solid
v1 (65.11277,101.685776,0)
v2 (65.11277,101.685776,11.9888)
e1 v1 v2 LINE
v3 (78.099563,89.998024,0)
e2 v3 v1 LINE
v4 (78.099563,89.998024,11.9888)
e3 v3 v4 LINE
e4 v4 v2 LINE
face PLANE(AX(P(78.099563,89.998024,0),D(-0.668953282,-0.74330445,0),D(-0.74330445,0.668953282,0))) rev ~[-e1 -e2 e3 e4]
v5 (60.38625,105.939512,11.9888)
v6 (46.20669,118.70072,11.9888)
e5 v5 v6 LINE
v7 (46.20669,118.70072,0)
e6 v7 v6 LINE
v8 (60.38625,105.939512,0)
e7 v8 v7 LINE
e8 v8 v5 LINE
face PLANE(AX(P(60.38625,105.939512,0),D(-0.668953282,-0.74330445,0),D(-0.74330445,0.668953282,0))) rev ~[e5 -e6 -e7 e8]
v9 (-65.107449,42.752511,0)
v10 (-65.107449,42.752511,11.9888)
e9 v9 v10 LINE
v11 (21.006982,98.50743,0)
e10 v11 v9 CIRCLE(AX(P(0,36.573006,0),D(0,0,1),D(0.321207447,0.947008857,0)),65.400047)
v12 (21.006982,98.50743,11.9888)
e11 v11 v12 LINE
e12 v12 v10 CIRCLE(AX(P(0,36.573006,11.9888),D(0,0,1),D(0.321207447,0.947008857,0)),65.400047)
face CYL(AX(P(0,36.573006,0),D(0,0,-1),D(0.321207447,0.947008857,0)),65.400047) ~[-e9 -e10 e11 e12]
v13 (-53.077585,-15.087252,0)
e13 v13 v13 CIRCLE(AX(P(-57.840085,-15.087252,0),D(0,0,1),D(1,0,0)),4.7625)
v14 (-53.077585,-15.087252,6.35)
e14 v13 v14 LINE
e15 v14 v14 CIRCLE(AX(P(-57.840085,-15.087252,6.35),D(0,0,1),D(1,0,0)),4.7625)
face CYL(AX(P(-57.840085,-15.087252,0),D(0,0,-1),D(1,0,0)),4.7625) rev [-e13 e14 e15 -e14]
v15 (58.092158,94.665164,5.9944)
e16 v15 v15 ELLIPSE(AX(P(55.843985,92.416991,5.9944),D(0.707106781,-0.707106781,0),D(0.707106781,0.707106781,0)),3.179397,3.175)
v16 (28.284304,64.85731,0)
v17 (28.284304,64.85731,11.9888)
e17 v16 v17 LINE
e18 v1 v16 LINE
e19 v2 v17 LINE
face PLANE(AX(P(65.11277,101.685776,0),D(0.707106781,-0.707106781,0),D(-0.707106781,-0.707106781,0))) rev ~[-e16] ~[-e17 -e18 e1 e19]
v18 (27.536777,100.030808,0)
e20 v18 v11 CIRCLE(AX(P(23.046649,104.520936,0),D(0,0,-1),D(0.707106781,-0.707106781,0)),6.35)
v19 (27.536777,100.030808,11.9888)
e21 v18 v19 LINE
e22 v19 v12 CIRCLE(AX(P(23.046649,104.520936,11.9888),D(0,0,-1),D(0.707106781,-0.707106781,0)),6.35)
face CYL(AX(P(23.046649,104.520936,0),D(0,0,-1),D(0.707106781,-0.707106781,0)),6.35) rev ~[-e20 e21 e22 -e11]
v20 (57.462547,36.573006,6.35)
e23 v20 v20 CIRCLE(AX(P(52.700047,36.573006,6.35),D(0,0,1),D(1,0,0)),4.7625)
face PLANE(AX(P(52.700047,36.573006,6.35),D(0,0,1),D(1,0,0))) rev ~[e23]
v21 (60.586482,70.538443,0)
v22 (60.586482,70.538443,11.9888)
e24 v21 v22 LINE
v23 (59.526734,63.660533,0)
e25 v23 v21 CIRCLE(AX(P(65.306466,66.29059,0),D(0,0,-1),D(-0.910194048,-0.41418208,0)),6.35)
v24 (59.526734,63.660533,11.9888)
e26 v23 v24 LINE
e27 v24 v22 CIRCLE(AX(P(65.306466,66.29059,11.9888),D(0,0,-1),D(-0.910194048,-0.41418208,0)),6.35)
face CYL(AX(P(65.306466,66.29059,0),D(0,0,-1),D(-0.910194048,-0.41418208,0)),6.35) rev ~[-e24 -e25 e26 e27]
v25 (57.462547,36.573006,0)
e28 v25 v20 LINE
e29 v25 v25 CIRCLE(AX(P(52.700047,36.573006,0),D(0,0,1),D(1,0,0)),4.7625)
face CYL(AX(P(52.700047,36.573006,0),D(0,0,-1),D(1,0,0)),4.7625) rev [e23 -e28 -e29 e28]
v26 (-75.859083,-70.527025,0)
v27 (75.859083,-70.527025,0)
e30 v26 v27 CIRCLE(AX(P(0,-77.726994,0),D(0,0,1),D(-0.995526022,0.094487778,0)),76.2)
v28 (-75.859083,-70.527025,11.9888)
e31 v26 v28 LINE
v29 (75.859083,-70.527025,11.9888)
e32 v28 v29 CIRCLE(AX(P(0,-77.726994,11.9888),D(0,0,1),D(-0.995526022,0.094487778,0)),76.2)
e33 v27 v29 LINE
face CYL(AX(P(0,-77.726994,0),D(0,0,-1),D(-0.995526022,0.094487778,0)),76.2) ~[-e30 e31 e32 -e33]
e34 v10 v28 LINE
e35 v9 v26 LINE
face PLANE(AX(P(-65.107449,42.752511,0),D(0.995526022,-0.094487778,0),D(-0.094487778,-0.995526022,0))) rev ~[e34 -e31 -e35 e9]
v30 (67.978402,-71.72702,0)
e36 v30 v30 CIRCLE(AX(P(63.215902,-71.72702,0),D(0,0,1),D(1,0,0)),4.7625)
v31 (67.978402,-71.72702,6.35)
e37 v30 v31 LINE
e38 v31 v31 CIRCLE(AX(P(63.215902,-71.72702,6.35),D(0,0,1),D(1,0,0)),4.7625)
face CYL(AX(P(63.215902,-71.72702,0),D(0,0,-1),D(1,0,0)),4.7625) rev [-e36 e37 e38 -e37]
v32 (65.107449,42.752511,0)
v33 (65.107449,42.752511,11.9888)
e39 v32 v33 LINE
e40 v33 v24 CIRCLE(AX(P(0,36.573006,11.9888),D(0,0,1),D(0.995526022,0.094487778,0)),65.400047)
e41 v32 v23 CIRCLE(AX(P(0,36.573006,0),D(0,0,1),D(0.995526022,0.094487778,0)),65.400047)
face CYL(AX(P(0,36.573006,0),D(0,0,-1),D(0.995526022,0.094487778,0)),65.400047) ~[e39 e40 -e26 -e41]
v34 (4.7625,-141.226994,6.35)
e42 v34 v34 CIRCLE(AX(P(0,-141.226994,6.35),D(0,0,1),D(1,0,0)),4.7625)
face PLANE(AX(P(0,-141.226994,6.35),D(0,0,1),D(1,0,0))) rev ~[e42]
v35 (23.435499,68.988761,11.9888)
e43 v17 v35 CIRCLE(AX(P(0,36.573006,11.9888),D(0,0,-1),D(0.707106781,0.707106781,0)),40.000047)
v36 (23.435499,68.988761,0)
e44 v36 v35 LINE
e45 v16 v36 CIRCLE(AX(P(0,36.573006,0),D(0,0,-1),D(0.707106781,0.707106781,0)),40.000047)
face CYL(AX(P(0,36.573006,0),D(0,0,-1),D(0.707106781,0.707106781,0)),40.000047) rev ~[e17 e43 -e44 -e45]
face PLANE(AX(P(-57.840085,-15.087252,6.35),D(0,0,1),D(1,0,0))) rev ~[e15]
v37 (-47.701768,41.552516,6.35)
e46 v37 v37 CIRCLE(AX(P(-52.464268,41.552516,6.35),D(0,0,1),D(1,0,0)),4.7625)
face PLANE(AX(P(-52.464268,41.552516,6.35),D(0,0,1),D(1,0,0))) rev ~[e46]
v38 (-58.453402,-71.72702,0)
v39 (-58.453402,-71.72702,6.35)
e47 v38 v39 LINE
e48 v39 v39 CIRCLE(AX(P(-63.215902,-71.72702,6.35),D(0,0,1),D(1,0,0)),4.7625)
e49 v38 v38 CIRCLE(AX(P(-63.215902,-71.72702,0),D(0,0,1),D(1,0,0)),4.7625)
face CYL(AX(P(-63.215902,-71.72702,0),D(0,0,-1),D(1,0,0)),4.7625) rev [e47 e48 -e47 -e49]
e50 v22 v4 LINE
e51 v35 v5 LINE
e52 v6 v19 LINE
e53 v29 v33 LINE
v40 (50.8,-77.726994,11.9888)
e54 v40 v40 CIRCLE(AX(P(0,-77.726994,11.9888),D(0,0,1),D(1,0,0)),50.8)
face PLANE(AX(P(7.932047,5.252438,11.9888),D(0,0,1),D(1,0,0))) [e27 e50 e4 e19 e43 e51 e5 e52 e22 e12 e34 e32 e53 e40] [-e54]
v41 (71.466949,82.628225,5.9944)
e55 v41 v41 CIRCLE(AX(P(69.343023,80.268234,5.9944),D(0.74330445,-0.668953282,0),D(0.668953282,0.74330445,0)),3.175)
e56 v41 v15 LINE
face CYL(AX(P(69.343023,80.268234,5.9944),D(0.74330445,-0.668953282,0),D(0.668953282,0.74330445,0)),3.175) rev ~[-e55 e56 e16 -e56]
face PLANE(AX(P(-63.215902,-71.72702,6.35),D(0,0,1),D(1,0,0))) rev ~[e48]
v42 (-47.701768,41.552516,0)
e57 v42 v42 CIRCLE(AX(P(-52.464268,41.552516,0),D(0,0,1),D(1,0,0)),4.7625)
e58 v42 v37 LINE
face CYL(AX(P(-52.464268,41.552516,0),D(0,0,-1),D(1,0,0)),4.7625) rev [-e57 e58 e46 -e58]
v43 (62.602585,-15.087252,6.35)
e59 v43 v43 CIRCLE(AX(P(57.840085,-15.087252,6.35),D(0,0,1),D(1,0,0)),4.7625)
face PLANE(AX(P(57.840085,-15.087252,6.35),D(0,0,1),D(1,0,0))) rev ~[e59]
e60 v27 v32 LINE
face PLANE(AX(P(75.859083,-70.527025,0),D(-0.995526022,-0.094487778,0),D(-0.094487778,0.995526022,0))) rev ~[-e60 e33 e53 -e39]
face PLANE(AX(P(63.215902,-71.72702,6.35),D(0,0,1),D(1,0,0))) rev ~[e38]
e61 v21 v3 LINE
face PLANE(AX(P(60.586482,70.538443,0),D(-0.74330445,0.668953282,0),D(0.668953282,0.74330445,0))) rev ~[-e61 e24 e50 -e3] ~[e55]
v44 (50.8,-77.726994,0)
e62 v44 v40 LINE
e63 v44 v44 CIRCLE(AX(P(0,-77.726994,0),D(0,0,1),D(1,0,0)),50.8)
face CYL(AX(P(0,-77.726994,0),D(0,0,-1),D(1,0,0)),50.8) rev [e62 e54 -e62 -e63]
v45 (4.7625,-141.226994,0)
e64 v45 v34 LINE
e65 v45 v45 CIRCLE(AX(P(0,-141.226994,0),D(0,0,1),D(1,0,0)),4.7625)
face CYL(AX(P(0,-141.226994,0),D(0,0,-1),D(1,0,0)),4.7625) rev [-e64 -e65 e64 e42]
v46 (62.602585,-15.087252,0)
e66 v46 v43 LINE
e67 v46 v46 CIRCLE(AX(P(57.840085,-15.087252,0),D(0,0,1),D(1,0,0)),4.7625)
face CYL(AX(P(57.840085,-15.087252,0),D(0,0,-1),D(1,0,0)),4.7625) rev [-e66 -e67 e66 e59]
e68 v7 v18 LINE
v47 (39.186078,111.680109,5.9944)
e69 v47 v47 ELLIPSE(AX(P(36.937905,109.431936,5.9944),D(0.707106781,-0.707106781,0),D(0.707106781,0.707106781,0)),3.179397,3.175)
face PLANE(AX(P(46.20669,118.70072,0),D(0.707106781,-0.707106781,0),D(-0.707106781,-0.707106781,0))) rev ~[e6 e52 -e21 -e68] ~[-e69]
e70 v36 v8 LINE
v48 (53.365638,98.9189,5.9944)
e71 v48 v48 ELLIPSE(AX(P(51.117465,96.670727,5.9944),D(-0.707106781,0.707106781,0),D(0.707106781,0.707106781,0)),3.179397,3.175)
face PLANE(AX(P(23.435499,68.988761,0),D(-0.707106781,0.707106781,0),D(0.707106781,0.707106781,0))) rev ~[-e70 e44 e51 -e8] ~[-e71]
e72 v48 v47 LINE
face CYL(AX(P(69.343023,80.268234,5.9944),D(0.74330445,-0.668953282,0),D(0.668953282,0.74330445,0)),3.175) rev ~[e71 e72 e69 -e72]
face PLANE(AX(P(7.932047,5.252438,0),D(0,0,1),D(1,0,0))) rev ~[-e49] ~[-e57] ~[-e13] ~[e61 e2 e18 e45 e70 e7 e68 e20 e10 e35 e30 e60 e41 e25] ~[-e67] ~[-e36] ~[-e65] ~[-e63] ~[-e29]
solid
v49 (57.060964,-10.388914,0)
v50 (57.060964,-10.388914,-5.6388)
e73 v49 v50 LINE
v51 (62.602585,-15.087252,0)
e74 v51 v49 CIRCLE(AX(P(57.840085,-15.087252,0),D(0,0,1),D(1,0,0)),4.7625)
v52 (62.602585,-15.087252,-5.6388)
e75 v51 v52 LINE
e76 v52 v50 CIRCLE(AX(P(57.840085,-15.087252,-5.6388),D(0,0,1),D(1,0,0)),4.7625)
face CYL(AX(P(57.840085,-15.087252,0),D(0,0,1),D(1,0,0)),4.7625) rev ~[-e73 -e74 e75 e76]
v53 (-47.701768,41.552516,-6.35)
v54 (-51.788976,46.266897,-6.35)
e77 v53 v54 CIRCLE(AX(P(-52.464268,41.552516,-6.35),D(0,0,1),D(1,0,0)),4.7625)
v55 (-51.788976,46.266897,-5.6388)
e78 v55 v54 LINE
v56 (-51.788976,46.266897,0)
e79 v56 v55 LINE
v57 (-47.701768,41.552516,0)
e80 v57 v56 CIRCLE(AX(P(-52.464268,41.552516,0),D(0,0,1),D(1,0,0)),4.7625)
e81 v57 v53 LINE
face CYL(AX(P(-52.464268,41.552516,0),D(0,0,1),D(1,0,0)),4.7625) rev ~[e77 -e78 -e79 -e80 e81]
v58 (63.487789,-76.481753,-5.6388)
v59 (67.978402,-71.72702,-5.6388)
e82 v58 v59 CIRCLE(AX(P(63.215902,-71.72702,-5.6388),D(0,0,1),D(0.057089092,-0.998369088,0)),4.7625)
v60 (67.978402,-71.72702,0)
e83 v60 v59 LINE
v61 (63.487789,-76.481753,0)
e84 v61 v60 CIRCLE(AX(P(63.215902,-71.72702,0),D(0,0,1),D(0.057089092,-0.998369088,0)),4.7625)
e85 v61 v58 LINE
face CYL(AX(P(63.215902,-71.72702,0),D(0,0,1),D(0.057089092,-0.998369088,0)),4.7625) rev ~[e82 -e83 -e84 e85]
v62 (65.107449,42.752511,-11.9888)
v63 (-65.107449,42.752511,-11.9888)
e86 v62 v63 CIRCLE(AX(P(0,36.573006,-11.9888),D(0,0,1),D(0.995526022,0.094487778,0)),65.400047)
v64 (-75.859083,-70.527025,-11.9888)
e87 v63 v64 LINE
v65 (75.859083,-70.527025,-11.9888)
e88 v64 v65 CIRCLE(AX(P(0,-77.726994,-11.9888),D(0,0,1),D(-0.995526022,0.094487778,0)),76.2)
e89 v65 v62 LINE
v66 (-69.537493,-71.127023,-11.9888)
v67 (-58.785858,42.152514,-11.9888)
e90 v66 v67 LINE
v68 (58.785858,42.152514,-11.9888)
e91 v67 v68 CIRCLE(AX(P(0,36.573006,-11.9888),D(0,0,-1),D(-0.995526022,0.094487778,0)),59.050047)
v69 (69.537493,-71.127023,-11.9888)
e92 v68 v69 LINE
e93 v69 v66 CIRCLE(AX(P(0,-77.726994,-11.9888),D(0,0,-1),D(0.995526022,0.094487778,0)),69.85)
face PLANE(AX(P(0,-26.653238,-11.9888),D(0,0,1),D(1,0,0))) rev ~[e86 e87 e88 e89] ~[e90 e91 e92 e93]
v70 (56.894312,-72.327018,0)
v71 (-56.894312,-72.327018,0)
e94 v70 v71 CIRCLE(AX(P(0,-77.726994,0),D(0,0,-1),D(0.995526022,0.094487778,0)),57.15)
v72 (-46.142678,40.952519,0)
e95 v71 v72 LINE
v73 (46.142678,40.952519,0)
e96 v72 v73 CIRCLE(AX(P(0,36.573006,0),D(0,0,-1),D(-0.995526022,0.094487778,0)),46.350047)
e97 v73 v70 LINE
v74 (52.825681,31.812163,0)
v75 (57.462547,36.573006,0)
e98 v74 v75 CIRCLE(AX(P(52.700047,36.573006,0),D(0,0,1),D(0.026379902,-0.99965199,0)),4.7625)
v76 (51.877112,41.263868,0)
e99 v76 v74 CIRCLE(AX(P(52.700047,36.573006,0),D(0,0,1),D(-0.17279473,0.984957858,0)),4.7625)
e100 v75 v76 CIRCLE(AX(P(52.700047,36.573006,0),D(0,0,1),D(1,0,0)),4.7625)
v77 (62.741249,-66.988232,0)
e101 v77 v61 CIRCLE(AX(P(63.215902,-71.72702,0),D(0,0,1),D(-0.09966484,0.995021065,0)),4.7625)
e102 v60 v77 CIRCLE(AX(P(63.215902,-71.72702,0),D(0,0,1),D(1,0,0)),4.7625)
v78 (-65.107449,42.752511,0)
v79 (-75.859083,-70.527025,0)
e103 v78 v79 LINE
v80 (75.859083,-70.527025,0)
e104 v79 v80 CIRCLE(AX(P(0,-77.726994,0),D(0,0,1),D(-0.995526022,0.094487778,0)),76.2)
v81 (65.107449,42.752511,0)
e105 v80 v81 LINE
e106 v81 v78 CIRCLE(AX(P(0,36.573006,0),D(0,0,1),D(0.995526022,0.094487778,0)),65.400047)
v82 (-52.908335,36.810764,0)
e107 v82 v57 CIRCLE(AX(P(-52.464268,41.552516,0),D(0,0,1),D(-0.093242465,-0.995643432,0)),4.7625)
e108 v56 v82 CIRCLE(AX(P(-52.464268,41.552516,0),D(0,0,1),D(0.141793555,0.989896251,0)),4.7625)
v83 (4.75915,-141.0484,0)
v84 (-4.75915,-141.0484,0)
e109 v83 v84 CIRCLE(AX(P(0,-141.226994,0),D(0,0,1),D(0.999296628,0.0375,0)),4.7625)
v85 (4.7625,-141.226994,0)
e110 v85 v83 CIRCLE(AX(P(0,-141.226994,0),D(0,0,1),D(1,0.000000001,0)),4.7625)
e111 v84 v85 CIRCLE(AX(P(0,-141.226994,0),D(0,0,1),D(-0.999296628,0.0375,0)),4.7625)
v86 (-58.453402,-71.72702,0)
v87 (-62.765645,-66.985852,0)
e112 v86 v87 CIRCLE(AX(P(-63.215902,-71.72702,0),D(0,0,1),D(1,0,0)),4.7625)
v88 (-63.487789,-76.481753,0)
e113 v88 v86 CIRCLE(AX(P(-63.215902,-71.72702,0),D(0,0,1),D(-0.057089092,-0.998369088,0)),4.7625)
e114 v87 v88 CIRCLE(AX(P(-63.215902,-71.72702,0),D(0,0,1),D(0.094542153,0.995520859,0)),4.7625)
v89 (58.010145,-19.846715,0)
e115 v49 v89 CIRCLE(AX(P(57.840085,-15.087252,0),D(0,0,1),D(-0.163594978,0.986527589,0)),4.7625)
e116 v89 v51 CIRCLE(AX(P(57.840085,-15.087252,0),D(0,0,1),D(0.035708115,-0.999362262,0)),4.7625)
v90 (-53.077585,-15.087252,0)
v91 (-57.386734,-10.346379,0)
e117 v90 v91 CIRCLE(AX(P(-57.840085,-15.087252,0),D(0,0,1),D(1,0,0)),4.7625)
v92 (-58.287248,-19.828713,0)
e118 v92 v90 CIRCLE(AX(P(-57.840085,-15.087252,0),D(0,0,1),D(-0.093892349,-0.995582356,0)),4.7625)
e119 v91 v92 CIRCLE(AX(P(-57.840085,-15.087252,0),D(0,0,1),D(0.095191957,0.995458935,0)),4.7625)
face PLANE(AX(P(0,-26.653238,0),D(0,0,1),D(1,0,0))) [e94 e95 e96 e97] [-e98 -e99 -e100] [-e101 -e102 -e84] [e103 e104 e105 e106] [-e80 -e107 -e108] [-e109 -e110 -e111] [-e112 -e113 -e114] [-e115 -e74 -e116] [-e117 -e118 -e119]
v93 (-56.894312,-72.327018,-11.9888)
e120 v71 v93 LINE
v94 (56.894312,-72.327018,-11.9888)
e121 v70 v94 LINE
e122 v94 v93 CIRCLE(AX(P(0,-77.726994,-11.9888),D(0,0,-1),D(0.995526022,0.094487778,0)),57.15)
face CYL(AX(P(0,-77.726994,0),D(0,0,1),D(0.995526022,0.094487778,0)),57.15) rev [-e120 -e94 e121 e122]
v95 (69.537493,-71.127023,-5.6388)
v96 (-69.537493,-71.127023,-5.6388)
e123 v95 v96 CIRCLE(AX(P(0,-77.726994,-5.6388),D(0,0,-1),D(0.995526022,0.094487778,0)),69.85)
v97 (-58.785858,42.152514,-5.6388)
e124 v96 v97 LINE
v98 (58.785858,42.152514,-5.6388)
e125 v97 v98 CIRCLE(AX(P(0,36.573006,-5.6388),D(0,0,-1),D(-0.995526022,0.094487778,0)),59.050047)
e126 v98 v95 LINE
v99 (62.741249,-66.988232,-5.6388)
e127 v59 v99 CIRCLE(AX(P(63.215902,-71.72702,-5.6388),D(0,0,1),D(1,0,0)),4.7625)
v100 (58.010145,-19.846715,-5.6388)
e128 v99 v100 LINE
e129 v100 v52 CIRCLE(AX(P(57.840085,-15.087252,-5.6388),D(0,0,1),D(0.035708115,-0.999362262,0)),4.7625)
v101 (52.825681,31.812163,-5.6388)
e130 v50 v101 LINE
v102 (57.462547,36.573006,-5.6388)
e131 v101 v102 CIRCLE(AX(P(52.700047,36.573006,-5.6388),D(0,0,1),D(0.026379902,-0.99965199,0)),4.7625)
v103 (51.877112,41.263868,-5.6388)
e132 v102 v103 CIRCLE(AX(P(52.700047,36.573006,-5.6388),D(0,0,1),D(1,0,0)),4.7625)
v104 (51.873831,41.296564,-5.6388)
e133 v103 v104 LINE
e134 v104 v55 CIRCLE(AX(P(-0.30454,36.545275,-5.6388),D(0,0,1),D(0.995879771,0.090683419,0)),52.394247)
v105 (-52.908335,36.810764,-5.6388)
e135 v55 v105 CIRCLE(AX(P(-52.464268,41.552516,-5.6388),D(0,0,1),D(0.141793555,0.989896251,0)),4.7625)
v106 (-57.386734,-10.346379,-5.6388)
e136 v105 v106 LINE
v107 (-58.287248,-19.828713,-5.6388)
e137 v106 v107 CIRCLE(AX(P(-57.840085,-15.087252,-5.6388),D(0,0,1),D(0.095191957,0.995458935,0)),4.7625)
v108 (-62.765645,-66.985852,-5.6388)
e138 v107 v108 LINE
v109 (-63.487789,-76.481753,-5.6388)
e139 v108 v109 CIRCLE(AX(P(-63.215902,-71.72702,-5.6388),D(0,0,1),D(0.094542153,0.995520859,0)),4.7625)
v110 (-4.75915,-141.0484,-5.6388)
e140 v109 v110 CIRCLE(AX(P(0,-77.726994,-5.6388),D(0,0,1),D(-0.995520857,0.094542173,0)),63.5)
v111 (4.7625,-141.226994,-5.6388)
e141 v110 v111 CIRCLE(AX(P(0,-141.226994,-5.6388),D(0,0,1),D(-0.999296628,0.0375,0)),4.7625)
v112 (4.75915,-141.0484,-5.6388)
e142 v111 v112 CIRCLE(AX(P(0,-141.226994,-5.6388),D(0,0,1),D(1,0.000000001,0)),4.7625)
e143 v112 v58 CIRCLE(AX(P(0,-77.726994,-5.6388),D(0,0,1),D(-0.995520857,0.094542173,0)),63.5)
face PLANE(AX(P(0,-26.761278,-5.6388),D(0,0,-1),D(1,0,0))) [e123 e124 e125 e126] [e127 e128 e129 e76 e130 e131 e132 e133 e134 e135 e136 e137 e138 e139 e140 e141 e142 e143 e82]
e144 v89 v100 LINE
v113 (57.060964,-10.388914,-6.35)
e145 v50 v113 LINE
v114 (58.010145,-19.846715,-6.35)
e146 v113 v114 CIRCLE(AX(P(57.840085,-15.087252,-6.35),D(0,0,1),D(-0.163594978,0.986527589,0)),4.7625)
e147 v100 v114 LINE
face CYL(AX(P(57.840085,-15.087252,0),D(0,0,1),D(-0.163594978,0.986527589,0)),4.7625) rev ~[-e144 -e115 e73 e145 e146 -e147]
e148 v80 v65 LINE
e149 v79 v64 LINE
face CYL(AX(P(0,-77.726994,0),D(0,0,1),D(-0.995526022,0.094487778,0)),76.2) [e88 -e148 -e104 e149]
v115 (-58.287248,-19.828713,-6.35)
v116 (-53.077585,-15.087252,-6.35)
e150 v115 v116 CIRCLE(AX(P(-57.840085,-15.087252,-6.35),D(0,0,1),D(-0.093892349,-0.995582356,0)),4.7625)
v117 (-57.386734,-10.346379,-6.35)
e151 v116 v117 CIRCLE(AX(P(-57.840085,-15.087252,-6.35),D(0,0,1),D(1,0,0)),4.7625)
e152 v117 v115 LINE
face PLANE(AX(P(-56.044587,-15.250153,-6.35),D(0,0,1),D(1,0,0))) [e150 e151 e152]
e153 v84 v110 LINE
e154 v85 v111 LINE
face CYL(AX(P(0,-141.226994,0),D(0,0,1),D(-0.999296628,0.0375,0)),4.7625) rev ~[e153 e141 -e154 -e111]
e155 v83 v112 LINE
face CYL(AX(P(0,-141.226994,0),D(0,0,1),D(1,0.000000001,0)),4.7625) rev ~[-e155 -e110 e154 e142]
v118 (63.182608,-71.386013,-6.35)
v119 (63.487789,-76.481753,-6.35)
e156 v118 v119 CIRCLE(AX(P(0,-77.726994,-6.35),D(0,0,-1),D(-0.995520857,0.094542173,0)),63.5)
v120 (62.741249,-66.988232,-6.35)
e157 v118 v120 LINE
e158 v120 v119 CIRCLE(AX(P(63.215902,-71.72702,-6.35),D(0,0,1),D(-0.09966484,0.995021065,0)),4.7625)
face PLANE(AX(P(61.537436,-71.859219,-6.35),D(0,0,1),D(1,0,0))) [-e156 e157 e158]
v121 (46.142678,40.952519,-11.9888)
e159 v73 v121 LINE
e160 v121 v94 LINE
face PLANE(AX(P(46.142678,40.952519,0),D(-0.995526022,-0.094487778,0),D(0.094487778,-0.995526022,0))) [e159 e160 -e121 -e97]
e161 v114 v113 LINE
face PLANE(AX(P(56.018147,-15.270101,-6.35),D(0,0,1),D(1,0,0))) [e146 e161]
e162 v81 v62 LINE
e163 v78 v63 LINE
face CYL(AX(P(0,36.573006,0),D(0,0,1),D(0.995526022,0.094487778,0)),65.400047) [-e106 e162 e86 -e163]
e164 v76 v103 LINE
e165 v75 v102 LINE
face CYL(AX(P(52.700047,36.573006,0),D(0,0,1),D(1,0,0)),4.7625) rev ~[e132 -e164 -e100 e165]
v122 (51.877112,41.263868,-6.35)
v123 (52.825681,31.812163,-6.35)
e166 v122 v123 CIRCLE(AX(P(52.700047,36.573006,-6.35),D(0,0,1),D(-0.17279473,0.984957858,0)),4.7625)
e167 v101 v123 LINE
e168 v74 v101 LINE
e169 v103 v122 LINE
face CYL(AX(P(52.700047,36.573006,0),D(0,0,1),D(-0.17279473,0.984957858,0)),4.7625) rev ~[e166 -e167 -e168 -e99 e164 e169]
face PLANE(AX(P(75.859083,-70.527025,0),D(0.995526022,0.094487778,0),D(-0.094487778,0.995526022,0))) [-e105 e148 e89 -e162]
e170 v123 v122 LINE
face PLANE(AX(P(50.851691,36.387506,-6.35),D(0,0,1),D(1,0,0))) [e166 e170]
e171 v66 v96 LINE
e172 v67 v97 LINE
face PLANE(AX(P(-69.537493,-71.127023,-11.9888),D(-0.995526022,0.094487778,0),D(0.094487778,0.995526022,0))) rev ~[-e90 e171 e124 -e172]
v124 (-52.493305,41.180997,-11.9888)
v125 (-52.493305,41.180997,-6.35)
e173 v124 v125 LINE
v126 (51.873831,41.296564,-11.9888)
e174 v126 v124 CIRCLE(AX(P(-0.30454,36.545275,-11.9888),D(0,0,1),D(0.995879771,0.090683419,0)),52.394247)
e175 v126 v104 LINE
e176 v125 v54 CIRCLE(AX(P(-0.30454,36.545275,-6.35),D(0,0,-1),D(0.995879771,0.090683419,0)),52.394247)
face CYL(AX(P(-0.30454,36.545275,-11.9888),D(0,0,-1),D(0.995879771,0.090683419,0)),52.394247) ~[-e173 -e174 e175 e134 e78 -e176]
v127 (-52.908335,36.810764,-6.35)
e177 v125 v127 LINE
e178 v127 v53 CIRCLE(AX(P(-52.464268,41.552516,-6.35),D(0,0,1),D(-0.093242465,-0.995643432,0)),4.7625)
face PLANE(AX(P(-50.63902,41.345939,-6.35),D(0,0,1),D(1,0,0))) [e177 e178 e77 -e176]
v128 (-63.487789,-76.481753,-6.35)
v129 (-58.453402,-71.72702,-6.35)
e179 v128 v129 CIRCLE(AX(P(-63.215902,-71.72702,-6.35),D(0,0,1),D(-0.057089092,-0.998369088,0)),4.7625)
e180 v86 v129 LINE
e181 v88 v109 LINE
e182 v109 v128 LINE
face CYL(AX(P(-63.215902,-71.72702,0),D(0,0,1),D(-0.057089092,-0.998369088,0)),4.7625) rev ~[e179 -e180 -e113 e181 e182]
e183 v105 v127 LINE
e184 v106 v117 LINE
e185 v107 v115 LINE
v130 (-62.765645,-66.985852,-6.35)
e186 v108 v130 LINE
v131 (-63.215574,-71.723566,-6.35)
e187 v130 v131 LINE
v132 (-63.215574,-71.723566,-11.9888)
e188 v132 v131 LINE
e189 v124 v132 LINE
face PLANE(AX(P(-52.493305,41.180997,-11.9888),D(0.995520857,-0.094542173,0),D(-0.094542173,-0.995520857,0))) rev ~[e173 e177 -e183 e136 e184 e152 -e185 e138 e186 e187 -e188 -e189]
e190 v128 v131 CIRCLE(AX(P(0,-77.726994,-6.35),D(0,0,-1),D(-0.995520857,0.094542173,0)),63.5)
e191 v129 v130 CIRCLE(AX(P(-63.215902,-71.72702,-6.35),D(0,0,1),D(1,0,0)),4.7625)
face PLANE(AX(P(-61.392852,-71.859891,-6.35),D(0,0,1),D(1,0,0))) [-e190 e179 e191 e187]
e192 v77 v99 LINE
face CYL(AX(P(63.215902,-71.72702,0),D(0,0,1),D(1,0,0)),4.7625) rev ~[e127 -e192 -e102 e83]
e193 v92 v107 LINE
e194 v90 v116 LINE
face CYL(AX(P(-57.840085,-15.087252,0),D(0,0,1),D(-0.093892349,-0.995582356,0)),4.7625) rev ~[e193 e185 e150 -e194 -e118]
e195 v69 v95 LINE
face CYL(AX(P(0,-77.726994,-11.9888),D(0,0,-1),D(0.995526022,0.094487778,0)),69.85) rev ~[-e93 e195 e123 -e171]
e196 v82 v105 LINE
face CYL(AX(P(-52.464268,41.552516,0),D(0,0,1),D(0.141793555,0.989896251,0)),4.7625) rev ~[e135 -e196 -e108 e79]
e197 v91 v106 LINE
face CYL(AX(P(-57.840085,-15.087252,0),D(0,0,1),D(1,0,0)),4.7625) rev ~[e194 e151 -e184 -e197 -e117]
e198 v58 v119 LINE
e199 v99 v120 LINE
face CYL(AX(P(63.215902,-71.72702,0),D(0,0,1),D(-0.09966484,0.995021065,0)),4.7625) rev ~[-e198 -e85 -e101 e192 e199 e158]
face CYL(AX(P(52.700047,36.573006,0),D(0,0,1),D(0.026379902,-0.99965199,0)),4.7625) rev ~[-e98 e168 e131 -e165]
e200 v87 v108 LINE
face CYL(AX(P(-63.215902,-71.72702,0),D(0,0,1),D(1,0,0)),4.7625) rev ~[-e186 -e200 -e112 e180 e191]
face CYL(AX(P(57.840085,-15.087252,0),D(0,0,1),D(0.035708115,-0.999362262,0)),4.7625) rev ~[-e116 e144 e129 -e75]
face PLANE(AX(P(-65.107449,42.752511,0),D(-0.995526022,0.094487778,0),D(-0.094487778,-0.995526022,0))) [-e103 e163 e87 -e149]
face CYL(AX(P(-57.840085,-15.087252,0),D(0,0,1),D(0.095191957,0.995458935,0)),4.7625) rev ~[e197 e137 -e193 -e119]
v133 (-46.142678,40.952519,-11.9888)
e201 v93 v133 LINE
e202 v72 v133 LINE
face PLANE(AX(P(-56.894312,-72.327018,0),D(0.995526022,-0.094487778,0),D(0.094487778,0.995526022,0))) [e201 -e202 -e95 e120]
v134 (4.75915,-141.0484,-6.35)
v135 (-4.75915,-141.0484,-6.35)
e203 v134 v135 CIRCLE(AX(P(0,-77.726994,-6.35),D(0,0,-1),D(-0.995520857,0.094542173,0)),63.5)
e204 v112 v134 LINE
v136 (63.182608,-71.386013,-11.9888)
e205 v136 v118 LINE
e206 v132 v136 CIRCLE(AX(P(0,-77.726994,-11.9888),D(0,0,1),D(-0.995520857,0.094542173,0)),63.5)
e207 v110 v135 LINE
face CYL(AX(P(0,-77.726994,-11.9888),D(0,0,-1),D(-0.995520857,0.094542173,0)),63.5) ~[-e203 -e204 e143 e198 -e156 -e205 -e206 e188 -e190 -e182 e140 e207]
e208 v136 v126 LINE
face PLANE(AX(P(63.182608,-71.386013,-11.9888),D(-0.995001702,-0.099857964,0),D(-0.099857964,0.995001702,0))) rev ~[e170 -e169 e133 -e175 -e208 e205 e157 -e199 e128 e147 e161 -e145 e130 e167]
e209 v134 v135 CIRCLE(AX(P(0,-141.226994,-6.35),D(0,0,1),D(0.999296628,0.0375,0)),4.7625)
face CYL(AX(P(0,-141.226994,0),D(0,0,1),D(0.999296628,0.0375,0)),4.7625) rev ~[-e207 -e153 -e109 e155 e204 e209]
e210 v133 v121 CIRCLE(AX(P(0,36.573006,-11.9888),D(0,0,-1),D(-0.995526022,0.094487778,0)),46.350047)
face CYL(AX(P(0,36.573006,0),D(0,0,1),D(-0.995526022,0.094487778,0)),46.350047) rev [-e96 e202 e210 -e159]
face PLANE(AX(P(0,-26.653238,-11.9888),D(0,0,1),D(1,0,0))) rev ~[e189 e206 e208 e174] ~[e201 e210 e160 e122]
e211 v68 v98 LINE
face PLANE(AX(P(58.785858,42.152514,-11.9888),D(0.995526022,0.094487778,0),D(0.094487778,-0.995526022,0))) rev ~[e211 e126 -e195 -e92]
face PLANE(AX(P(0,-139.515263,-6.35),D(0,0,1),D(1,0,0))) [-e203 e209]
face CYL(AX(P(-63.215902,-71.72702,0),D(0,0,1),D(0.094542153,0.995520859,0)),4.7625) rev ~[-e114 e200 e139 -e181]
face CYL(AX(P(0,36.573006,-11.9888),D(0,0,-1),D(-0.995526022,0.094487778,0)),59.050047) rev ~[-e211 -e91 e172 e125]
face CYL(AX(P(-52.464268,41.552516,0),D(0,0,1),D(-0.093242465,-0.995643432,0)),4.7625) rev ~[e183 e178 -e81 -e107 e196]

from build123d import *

# Parameters (mm, degrees)
F3_R      = 4.7625
F3_R_2    = 50.8
F4_DEPTH  = 11.9888
F5_R      = 3.175
F6_DEPTH  = 133.893314743
F8_DEPTH  = 11.9888
F10_DEPTH = 6.35
F11_DEPTH = 6.35
F12_DEPTH = 6.35


# Not quite as in the source:
# - a variable given as a bare number and used for a length is read in inches; the dataset says mm whatever the document's units were


with BuildPart() as f4:
    # F3 (on Top) → F4 (new body)
    with BuildSketch(Plane.XY):
        with BuildLine():
            ThreePointArc((28.2843044815, 64.8573104526), (-25.9422769004, 6.1262979516), (23.4354987006, 68.9887607928))
            Line((23.4354987006, 68.9887607928), (60.3862498519, 105.9395119442))
            Line((60.3862498519, 105.9395119442), (46.2066900189, 118.7007204743))
            Line((46.2066900189, 118.7007204743), (27.5367774821, 100.0308079375))
            ThreePointArc((27.5367774821, 100.0308079375), (24.4893412706, 98.3369938712), (21.0069821329, 98.5074297537))
            ThreePointArc((21.0069821329, 98.5074297537), (-35.5438535466, 91.4710990406), (-65.1074486079, 42.7525110788))
            Line((-65.1074486079, 42.7525110788), (-75.8590828523, -70.5270253622))
            ThreePointArc((-75.8590828523, -70.5270253622), (0, -153.9269940288), (75.8590828523, -70.5270253622))
            Line((75.8590828523, -70.5270253622), (65.1074486079, 42.7525110788))
            ThreePointArc((65.1074486079, 42.7525110788), (63.1878642435, 53.4389467972), (59.5267335018, 63.6605334739))
            ThreePointArc((59.5267335018, 63.6605334739), (59.0305262413, 67.2575870183), (60.5864824449, 70.5384430254))
            Line((60.5864824449, 70.5384430254), (78.0995628634, 89.9980240728))
            Line((78.0995628634, 89.9980240728), (65.1127697963, 101.6857757674))
            Line((65.1127697963, 101.6857757674), (28.2843044815, 64.8573104526))
        make_face()
        with Locations((0, -141.2269940288)):
            Circle(F3_R, mode=Mode.SUBTRACT)
        with Locations((-63.215902377, -71.72702014)):
            Circle(F3_R, mode=Mode.SUBTRACT)
        with Locations((0, -77.7269940288)):
            Circle(F3_R_2, mode=Mode.SUBTRACT)
        with Locations((63.215902377, -71.72702014)):
            Circle(F3_R, mode=Mode.SUBTRACT)
        with Locations((-57.8400852547, -15.0872519195)):
            Circle(F3_R, mode=Mode.SUBTRACT)
        with Locations((-52.4642681325, 41.552516301)):
            Circle(F3_R, mode=Mode.SUBTRACT)
        with Locations((57.8400852547, -15.0872519195)):
            Circle(F3_R, mode=Mode.SUBTRACT)
        with Locations((52.700047, 36.5730059712)):
            Circle(F3_R, mode=Mode.SUBTRACT)
        with Locations((-52.4642681325, 41.552516301)):
            Circle(F3_R)
        with Locations((52.700047, 36.5730059712)):
            Circle(F3_R)
        with Locations((57.8400852547, -15.0872519195)):
            Circle(F3_R)
        with Locations((63.215902377, -71.72702014)):
            Circle(F3_R)
        with Locations((0, -141.2269940288)):
            Circle(F3_R)
        with Locations((-63.215902377, -71.72702014)):
            Circle(F3_R)
        with Locations((-57.8400852547, -15.0872519195)):
            Circle(F3_R)
    extrude(amount=F4_DEPTH)

    # F5 (on face) → F6 (cut, through all)
    with BuildSketch(Plane(origin=(-1.6001270702, 1.4400697524, 0), x_dir=(0.6689532824, 0.7433044504, 0), z_dir=(0.7433044504, -0.6689532824, 0))):
        with Locations((106.0509778379, 5.9944)):
            Circle(F5_R)
    extrude(amount=-F6_DEPTH, mode=Mode.SUBTRACT)

    # F3 (on Top) → F10 (cut)
    with BuildSketch(Plane.XY):
        with Locations((-63.215902377, -71.72702014)):
            Circle(F3_R)
        with Locations((0, -141.2269940288)):
            Circle(F3_R)
        with Locations((63.215902377, -71.72702014)):
            Circle(F3_R)
        with Locations((57.8400852547, -15.0872519195)):
            Circle(F3_R)
        with Locations((52.700047, 36.5730059712)):
            Circle(F3_R)
        with Locations((-57.8400852547, -15.0872519195)):
            Circle(F3_R)
        with Locations((-52.4642681325, 41.552516301)):
            Circle(F3_R)
    extrude(amount=F10_DEPTH, mode=Mode.SUBTRACT)


with BuildPart() as f8:
    # F7 (on Top) → F8 (new body)
    with BuildSketch(Plane.XY):
        with BuildLine():
            Line((-65.1074486079, 42.7525110788), (-75.8590828523, -70.5270253622))
            ThreePointArc((-75.8590828523, -70.5270253622), (0, -153.9269940288), (75.8590828523, -70.5270253622))
            Line((75.8590828523, -70.5270253622), (65.1074486079, 42.7525110788))
            ThreePointArc((65.1074486079, 42.7525110788), (0, 101.9730529712), (-65.1074486079, 42.7525110788))
        make_face()
        with BuildLine():
            ThreePointArc((69.5374926147, -71.1270227511), (0, -147.5769940288), (-69.5374926147, -71.1270227511))
            Line((-69.5374926147, -71.1270227511), (-58.7858583702, 42.1525136899))
            ThreePointArc((-58.7858583702, 42.1525136899), (0, 95.6230529712), (58.7858583702, 42.1525136899))
            Line((58.7858583702, 42.1525136899), (69.5374926147, -71.1270227511))
        make_face(mode=Mode.SUBTRACT)
        with BuildLine():
            Line((-58.7858583702, 42.1525136899), (-69.5374926147, -71.1270227511))
            ThreePointArc((-69.5374926147, -71.1270227511), (0, -147.5769940288), (69.5374926147, -71.1270227511))
            Line((69.5374926147, -71.1270227511), (58.7858583702, 42.1525136899))
            ThreePointArc((58.7858583702, 42.1525136899), (0, 95.6230529712), (-58.7858583702, 42.1525136899))
        make_face()
        with BuildLine():
            ThreePointArc((-4.7591501891, -141.0484002788), (-46.9747184236, -120.4543369023), (-63.487789177, -76.4817529209))
            ThreePointArc((-63.487789177, -76.4817529209), (-67.9646903624, -71.3658845431), (-62.7656453711, -66.9858520477))
            Line((-62.7656453711, -66.9858520477), (-58.2872475671, -19.828712888))
            ThreePointArc((-58.2872475671, -19.828712888), (-62.581253338, -14.6369948193), (-57.3867335585, -10.3463787415))
            Line((-57.3867335585, -10.3463787415), (-52.9083353708, 36.8107644583))
            ThreePointArc((-52.9083353708, 36.8107644583), (-57.1937477857, 42.1123631196), (-51.7889763254, 46.2668971962))
            ThreePointArc((-51.7889763254, 46.2668971962), (2.2047304265, 88.8794003864), (51.8738306744, 41.2965644315))
            Line((51.8738306744, 41.2965644315), (51.8771120982, 41.263867768))
            ThreePointArc((51.8771120982, 41.263867768), (55.7629034103, 40.2199659188), (57.462547, 36.5730059712))
            ThreePointArc((57.462547, 36.5730059712), (56.1117723357, 33.2501252204), (52.8256812849, 31.8121633696))
            Line((52.8256812849, 31.8121633696), (57.0609641731, -10.3889142783))
            ThreePointArc((57.0609641731, -10.3889142783), (60.9199263301, -11.4546240552), (62.6025852547, -15.0872519195))
            ThreePointArc((62.6025852547, -15.0872519195), (61.2672791884, -18.3941761689), (58.0101451534, -19.8467146918))
            Line((58.0101451534, -19.8467146918), (62.7412485767, -66.9882323182))
            ThreePointArc((62.7412485767, -66.9882323182), (66.411279313, -68.1955937303), (67.978402377, -71.72702014))
            ThreePointArc((67.978402377, -71.72702014), (66.6782907965, -74.9970771245), (63.487789177, -76.4817529209))
            ThreePointArc((63.487789177, -76.4817529209), (46.9747184236, -120.4543369023), (4.7591501891, -141.0484002788))
            ThreePointArc((4.7591501891, -141.0484002788), (4.7616624736, -141.1376814475), (4.7625, -141.2269940288))
            ThreePointArc((4.7625, -141.2269940288), (-0.0893125814, -145.9886565025), (-4.7591501891, -141.0484002788))
        make_face(mode=Mode.SUBTRACT)
        with BuildLine():
            ThreePointArc((-58.453402377, -71.72702014), (-59.9458453924, -75.1894085595), (-63.487789177, -76.4817529209))
            ThreePointArc((-63.487789177, -76.4817529209), (-46.9747184236, -120.4543369023), (-4.7591501891, -141.0484002788))
            ThreePointArc((-4.7591501891, -141.0484002788), (0, -136.4644940288), (4.7591501891, -141.0484002788))
            ThreePointArc((4.7591501891, -141.0484002788), (46.9747184236, -120.4543369023), (63.487789177, -76.4817529209))
            ThreePointArc((63.487789177, -76.4817529209), (58.4680595012, -72.1003755704), (62.7412485767, -66.9882323182))
            Line((62.7412485767, -66.9882323182), (58.0101451534, -19.8467146918))
            ThreePointArc((58.0101451534, -19.8467146918), (53.1013896487, -15.5628254719), (57.0609641731, -10.3889142783))
            Line((57.0609641731, -10.3889142783), (52.8256812849, 31.8121633696))
            ThreePointArc((52.8256812849, 31.8121633696), (47.961351394, 36.0974324188), (51.8771120982, 41.263867768))
            Line((51.8771120982, 41.263867768), (51.8738306744, 41.2965644315))
            ThreePointArc((51.8738306744, 41.2965644315), (2.2047304265, 88.8794003864), (-51.7889763254, 46.2668971962))
            ThreePointArc((-51.7889763254, 46.2668971962), (-48.8658321194, 44.6722381651), (-47.7017681325, 41.552516301))
            ThreePointArc((-47.7017681325, 41.552516301), (-49.2575146319, 38.0314172912), (-52.9083353708, 36.8107644583))
            Line((-52.9083353708, 36.8107644583), (-57.3867335585, -10.3463787415))
            ThreePointArc((-57.3867335585, -10.3463787415), (-54.3158481952, -11.8839474696), (-53.0775852547, -15.0872519195))
            ThreePointArc((-53.0775852547, -15.0872519195), (-54.63448112, -18.6093973426), (-58.2872475671, -19.828712888))
            Line((-58.2872475671, -19.828712888), (-62.7656453711, -66.9858520477))
            ThreePointArc((-62.7656453711, -66.9858520477), (-59.6927109799, -68.5225656419), (-58.453402377, -71.72702014))
        make_face()
        with BuildLine():
            ThreePointArc((56.8943121393, -72.3270175288), (0, -134.8769940288), (-56.8943121393, -72.3270175288))
            Line((-56.8943121393, -72.3270175288), (-46.1426778948, 40.9525189121))
            ThreePointArc((-46.1426778948, 40.9525189121), (0, 82.9230529712), (46.1426778948, 40.9525189121))
            Line((46.1426778948, 40.9525189121), (56.8943121393, -72.3270175288))
        make_face(mode=Mode.SUBTRACT)
        with BuildLine():
            ThreePointArc((57.0609641731, -10.3889142783), (53.1013896487, -15.5628254719), (58.0101451534, -19.8467146918))
            Line((58.0101451534, -19.8467146918), (57.0609641731, -10.3889142783))
        make_face()
        with BuildLine():
            Line((57.0609641731, -10.3889142783), (58.0101451534, -19.8467146918))
            ThreePointArc((58.0101451534, -19.8467146918), (61.2672791884, -18.3941761689), (62.6025852547, -15.0872519195))
            ThreePointArc((62.6025852547, -15.0872519195), (60.9199263301, -11.4546240552), (57.0609641731, -10.3889142783))
        make_face()
        with BuildLine():
            ThreePointArc((63.1826080799, -71.3860133301), (63.3864261952, -73.9308151341), (63.487789177, -76.4817529209))
            ThreePointArc((63.487789177, -76.4817529209), (66.6782907965, -74.9970771245), (67.978402377, -71.72702014))
            ThreePointArc((67.978402377, -71.72702014), (66.411279313, -68.1955937303), (62.7412485767, -66.9882323182))
            Line((62.7412485767, -66.9882323182), (63.1826080799, -71.3860133301))
        make_face()
        with BuildLine():
            ThreePointArc((62.7412485767, -66.9882323182), (58.4680595012, -72.1003755704), (63.487789177, -76.4817529209))
            ThreePointArc((63.487789177, -76.4817529209), (63.3864261952, -73.9308151341), (63.1826080799, -71.3860133301))
            Line((63.1826080799, -71.3860133301), (62.7412485767, -66.9882323182))
        make_face()
        with BuildLine():
            ThreePointArc((4.7591501891, -141.0484002788), (0, -136.4644940288), (-4.7591501891, -141.0484002788))
            ThreePointArc((-4.7591501891, -141.0484002788), (0, -141.2269940288), (4.7591501891, -141.0484002788))
        make_face()
        with BuildLine():
            ThreePointArc((4.7591501891, -141.0484002788), (0, -141.2269940288), (-4.7591501891, -141.0484002788))
            ThreePointArc((-4.7591501891, -141.0484002788), (-0.0893125814, -145.9886565025), (4.7625, -141.2269940288))
            ThreePointArc((4.7625, -141.2269940288), (4.7616624736, -141.1376814475), (4.7591501891, -141.0484002788))
        make_face()
        with BuildLine():
            Line((-62.7656453711, -66.9858520477), (-63.2155744434, -71.723566026))
            ThreePointArc((-63.2155744434, -71.723566026), (-63.3963380158, -74.1001047026), (-63.487789177, -76.4817529209))
            ThreePointArc((-63.487789177, -76.4817529209), (-59.9458453924, -75.1894085595), (-58.453402377, -71.72702014))
            ThreePointArc((-58.453402377, -71.72702014), (-59.6927109799, -68.5225656419), (-62.7656453711, -66.9858520477))
        make_face()
        with BuildLine():
            ThreePointArc((-63.487789177, -76.4817529209), (-63.3963380158, -74.1001047026), (-63.2155744434, -71.723566026))
            Line((-63.2155744434, -71.723566026), (-62.7656453711, -66.9858520477))
            ThreePointArc((-62.7656453711, -66.9858520477), (-67.9646903624, -71.3658845431), (-63.487789177, -76.4817529209))
        make_face()
        with BuildLine():
            Line((-57.3867335585, -10.3463787415), (-58.2872475671, -19.828712888))
            ThreePointArc((-58.2872475671, -19.828712888), (-54.63448112, -18.6093973426), (-53.0775852547, -15.0872519195))
            ThreePointArc((-53.0775852547, -15.0872519195), (-54.3158481952, -11.8839474696), (-57.3867335585, -10.3463787415))
        make_face()
        with BuildLine():
            ThreePointArc((-57.3867335585, -10.3463787415), (-62.581253338, -14.6369948193), (-58.2872475671, -19.828712888))
            Line((-58.2872475671, -19.828712888), (-57.3867335585, -10.3463787415))
        make_face()
        with BuildLine():
            ThreePointArc((-51.7889763254, 46.2668971962), (-57.1937477857, 42.1123631196), (-52.9083353708, 36.8107644583))
            Line((-52.9083353708, 36.8107644583), (-52.4933051133, 41.1809969535))
            ThreePointArc((-52.4933051133, 41.1809969535), (-52.2034780379, 43.7325799552), (-51.7889763254, 46.2668971962))
        make_face()
        with BuildLine():
            Line((-52.4933051133, 41.1809969535), (-52.9083353708, 36.8107644583))
            ThreePointArc((-52.9083353708, 36.8107644583), (-49.2575146319, 38.0314172912), (-47.7017681325, 41.552516301))
            ThreePointArc((-47.7017681325, 41.552516301), (-48.8658321194, 44.6722381651), (-51.7889763254, 46.2668971962))
            ThreePointArc((-51.7889763254, 46.2668971962), (-52.2034780379, 43.7325799552), (-52.4933051133, 41.1809969535))
        make_face()
        with BuildLine():
            ThreePointArc((57.462547, 36.5730059712), (55.7629034103, 40.2199659188), (51.8771120982, 41.263867768))
            Line((51.8771120982, 41.263867768), (52.8256812849, 31.8121633696))
            ThreePointArc((52.8256812849, 31.8121633696), (56.1117723357, 33.2501252204), (57.462547, 36.5730059712))
        make_face()
        with BuildLine():
            Line((52.8256812849, 31.8121633696), (51.8771120982, 41.263867768))
            ThreePointArc((51.8771120982, 41.263867768), (47.961351394, 36.0974324188), (52.8256812849, 31.8121633696))
        make_face()
    extrude(amount=-F8_DEPTH)

    # F9 (on face) → F11 (cut)
    with BuildSketch(Plane(origin=(0, 0, -11.9888), x_dir=(1, 0, 0), z_dir=(0, 0, -1))):
        with BuildLine():
            Line((-69.5374926147, 71.1270227511), (-58.7858583702, -42.1525136899))
            ThreePointArc((-58.7858583702, -42.1525136899), (0, -95.6230529712), (58.7858583702, -42.1525136899))
            Line((58.7858583702, -42.1525136899), (69.5374926147, 71.1270227511))
            ThreePointArc((69.5374926147, 71.1270227511), (0, 147.5769940288), (-69.5374926147, 71.1270227511))
        make_face()
        with BuildLine():
            Line((-52.4933051133, -41.1809969535), (-63.2155744434, 71.723566026))
            ThreePointArc((-63.2155744434, 71.723566026), (0.1695793351, 141.2267675942), (63.1826080799, 71.3860133301))
            Line((63.1826080799, 71.3860133301), (51.8738306744, -41.2965644315))
            ThreePointArc((51.8738306744, -41.2965644315), (-0.3625570138, -88.9394898731), (-52.4933051133, -41.1809969535))
        make_face(mode=Mode.SUBTRACT)
    extrude(amount=-F11_DEPTH, mode=Mode.SUBTRACT)

    # F7 (on Top) → F12 (cut)
    with BuildSketch(Plane.XY):
        with BuildLine():
            ThreePointArc((62.7412485767, -66.9882323182), (58.4680595012, -72.1003755704), (63.487789177, -76.4817529209))
            ThreePointArc((63.487789177, -76.4817529209), (63.3864261952, -73.9308151341), (63.1826080799, -71.3860133301))
            Line((63.1826080799, -71.3860133301), (62.7412485767, -66.9882323182))
        make_face()
        with BuildLine():
            ThreePointArc((63.1826080799, -71.3860133301), (63.3864261952, -73.9308151341), (63.487789177, -76.4817529209))
            ThreePointArc((63.487789177, -76.4817529209), (66.6782907965, -74.9970771245), (67.978402377, -71.72702014))
            ThreePointArc((67.978402377, -71.72702014), (66.411279313, -68.1955937303), (62.7412485767, -66.9882323182))
            Line((62.7412485767, -66.9882323182), (63.1826080799, -71.3860133301))
        make_face()
        with BuildLine():
            ThreePointArc((57.0609641731, -10.3889142783), (53.1013896487, -15.5628254719), (58.0101451534, -19.8467146918))
            Line((58.0101451534, -19.8467146918), (57.0609641731, -10.3889142783))
        make_face()
        with BuildLine():
            Line((57.0609641731, -10.3889142783), (58.0101451534, -19.8467146918))
            ThreePointArc((58.0101451534, -19.8467146918), (61.2672791884, -18.3941761689), (62.6025852547, -15.0872519195))
            ThreePointArc((62.6025852547, -15.0872519195), (60.9199263301, -11.4546240552), (57.0609641731, -10.3889142783))
        make_face()
        with BuildLine():
            Line((52.8256812849, 31.8121633696), (51.8771120982, 41.263867768))
            ThreePointArc((51.8771120982, 41.263867768), (47.961351394, 36.0974324188), (52.8256812849, 31.8121633696))
        make_face()
        with BuildLine():
            ThreePointArc((57.462547, 36.5730059712), (55.7629034103, 40.2199659188), (51.8771120982, 41.263867768))
            Line((51.8771120982, 41.263867768), (52.8256812849, 31.8121633696))
            ThreePointArc((52.8256812849, 31.8121633696), (56.1117723357, 33.2501252204), (57.462547, 36.5730059712))
        make_face()
        with BuildLine():
            Line((-52.4933051133, 41.1809969535), (-52.9083353708, 36.8107644583))
            ThreePointArc((-52.9083353708, 36.8107644583), (-49.2575146319, 38.0314172912), (-47.7017681325, 41.552516301))
            ThreePointArc((-47.7017681325, 41.552516301), (-48.8658321194, 44.6722381651), (-51.7889763254, 46.2668971962))
            ThreePointArc((-51.7889763254, 46.2668971962), (-52.2034780379, 43.7325799552), (-52.4933051133, 41.1809969535))
        make_face()
        with BuildLine():
            ThreePointArc((-51.7889763254, 46.2668971962), (-57.1937477857, 42.1123631196), (-52.9083353708, 36.8107644583))
            Line((-52.9083353708, 36.8107644583), (-52.4933051133, 41.1809969535))
            ThreePointArc((-52.4933051133, 41.1809969535), (-52.2034780379, 43.7325799552), (-51.7889763254, 46.2668971962))
        make_face()
        with BuildLine():
            Line((-57.3867335585, -10.3463787415), (-58.2872475671, -19.828712888))
            ThreePointArc((-58.2872475671, -19.828712888), (-54.63448112, -18.6093973426), (-53.0775852547, -15.0872519195))
            ThreePointArc((-53.0775852547, -15.0872519195), (-54.3158481952, -11.8839474696), (-57.3867335585, -10.3463787415))
        make_face()
        with BuildLine():
            ThreePointArc((-57.3867335585, -10.3463787415), (-62.581253338, -14.6369948193), (-58.2872475671, -19.828712888))
            Line((-58.2872475671, -19.828712888), (-57.3867335585, -10.3463787415))
        make_face()
        with BuildLine():
            Line((-62.7656453711, -66.9858520477), (-63.2155744434, -71.723566026))
            ThreePointArc((-63.2155744434, -71.723566026), (-63.3963380158, -74.1001047026), (-63.487789177, -76.4817529209))
            ThreePointArc((-63.487789177, -76.4817529209), (-59.9458453924, -75.1894085595), (-58.453402377, -71.72702014))
            ThreePointArc((-58.453402377, -71.72702014), (-59.6927109799, -68.5225656419), (-62.7656453711, -66.9858520477))
        make_face()
        with BuildLine():
            ThreePointArc((-63.487789177, -76.4817529209), (-63.3963380158, -74.1001047026), (-63.2155744434, -71.723566026))
            Line((-63.2155744434, -71.723566026), (-62.7656453711, -66.9858520477))
            ThreePointArc((-62.7656453711, -66.9858520477), (-67.9646903624, -71.3658845431), (-63.487789177, -76.4817529209))
        make_face()
        with BuildLine():
            ThreePointArc((4.7591501891, -141.0484002788), (0, -136.4644940288), (-4.7591501891, -141.0484002788))
            ThreePointArc((-4.7591501891, -141.0484002788), (0, -141.2269940288), (4.7591501891, -141.0484002788))
        make_face()
        with BuildLine():
            ThreePointArc((4.7591501891, -141.0484002788), (0, -141.2269940288), (-4.7591501891, -141.0484002788))
            ThreePointArc((-4.7591501891, -141.0484002788), (-0.0893125814, -145.9886565025), (4.7625, -141.2269940288))
            ThreePointArc((4.7625, -141.2269940288), (4.7616624736, -141.1376814475), (4.7591501891, -141.0484002788))
        make_face()
    extrude(amount=-F12_DEPTH, mode=Mode.SUBTRACT)


solid = Compound([f4.part, f8.part])
